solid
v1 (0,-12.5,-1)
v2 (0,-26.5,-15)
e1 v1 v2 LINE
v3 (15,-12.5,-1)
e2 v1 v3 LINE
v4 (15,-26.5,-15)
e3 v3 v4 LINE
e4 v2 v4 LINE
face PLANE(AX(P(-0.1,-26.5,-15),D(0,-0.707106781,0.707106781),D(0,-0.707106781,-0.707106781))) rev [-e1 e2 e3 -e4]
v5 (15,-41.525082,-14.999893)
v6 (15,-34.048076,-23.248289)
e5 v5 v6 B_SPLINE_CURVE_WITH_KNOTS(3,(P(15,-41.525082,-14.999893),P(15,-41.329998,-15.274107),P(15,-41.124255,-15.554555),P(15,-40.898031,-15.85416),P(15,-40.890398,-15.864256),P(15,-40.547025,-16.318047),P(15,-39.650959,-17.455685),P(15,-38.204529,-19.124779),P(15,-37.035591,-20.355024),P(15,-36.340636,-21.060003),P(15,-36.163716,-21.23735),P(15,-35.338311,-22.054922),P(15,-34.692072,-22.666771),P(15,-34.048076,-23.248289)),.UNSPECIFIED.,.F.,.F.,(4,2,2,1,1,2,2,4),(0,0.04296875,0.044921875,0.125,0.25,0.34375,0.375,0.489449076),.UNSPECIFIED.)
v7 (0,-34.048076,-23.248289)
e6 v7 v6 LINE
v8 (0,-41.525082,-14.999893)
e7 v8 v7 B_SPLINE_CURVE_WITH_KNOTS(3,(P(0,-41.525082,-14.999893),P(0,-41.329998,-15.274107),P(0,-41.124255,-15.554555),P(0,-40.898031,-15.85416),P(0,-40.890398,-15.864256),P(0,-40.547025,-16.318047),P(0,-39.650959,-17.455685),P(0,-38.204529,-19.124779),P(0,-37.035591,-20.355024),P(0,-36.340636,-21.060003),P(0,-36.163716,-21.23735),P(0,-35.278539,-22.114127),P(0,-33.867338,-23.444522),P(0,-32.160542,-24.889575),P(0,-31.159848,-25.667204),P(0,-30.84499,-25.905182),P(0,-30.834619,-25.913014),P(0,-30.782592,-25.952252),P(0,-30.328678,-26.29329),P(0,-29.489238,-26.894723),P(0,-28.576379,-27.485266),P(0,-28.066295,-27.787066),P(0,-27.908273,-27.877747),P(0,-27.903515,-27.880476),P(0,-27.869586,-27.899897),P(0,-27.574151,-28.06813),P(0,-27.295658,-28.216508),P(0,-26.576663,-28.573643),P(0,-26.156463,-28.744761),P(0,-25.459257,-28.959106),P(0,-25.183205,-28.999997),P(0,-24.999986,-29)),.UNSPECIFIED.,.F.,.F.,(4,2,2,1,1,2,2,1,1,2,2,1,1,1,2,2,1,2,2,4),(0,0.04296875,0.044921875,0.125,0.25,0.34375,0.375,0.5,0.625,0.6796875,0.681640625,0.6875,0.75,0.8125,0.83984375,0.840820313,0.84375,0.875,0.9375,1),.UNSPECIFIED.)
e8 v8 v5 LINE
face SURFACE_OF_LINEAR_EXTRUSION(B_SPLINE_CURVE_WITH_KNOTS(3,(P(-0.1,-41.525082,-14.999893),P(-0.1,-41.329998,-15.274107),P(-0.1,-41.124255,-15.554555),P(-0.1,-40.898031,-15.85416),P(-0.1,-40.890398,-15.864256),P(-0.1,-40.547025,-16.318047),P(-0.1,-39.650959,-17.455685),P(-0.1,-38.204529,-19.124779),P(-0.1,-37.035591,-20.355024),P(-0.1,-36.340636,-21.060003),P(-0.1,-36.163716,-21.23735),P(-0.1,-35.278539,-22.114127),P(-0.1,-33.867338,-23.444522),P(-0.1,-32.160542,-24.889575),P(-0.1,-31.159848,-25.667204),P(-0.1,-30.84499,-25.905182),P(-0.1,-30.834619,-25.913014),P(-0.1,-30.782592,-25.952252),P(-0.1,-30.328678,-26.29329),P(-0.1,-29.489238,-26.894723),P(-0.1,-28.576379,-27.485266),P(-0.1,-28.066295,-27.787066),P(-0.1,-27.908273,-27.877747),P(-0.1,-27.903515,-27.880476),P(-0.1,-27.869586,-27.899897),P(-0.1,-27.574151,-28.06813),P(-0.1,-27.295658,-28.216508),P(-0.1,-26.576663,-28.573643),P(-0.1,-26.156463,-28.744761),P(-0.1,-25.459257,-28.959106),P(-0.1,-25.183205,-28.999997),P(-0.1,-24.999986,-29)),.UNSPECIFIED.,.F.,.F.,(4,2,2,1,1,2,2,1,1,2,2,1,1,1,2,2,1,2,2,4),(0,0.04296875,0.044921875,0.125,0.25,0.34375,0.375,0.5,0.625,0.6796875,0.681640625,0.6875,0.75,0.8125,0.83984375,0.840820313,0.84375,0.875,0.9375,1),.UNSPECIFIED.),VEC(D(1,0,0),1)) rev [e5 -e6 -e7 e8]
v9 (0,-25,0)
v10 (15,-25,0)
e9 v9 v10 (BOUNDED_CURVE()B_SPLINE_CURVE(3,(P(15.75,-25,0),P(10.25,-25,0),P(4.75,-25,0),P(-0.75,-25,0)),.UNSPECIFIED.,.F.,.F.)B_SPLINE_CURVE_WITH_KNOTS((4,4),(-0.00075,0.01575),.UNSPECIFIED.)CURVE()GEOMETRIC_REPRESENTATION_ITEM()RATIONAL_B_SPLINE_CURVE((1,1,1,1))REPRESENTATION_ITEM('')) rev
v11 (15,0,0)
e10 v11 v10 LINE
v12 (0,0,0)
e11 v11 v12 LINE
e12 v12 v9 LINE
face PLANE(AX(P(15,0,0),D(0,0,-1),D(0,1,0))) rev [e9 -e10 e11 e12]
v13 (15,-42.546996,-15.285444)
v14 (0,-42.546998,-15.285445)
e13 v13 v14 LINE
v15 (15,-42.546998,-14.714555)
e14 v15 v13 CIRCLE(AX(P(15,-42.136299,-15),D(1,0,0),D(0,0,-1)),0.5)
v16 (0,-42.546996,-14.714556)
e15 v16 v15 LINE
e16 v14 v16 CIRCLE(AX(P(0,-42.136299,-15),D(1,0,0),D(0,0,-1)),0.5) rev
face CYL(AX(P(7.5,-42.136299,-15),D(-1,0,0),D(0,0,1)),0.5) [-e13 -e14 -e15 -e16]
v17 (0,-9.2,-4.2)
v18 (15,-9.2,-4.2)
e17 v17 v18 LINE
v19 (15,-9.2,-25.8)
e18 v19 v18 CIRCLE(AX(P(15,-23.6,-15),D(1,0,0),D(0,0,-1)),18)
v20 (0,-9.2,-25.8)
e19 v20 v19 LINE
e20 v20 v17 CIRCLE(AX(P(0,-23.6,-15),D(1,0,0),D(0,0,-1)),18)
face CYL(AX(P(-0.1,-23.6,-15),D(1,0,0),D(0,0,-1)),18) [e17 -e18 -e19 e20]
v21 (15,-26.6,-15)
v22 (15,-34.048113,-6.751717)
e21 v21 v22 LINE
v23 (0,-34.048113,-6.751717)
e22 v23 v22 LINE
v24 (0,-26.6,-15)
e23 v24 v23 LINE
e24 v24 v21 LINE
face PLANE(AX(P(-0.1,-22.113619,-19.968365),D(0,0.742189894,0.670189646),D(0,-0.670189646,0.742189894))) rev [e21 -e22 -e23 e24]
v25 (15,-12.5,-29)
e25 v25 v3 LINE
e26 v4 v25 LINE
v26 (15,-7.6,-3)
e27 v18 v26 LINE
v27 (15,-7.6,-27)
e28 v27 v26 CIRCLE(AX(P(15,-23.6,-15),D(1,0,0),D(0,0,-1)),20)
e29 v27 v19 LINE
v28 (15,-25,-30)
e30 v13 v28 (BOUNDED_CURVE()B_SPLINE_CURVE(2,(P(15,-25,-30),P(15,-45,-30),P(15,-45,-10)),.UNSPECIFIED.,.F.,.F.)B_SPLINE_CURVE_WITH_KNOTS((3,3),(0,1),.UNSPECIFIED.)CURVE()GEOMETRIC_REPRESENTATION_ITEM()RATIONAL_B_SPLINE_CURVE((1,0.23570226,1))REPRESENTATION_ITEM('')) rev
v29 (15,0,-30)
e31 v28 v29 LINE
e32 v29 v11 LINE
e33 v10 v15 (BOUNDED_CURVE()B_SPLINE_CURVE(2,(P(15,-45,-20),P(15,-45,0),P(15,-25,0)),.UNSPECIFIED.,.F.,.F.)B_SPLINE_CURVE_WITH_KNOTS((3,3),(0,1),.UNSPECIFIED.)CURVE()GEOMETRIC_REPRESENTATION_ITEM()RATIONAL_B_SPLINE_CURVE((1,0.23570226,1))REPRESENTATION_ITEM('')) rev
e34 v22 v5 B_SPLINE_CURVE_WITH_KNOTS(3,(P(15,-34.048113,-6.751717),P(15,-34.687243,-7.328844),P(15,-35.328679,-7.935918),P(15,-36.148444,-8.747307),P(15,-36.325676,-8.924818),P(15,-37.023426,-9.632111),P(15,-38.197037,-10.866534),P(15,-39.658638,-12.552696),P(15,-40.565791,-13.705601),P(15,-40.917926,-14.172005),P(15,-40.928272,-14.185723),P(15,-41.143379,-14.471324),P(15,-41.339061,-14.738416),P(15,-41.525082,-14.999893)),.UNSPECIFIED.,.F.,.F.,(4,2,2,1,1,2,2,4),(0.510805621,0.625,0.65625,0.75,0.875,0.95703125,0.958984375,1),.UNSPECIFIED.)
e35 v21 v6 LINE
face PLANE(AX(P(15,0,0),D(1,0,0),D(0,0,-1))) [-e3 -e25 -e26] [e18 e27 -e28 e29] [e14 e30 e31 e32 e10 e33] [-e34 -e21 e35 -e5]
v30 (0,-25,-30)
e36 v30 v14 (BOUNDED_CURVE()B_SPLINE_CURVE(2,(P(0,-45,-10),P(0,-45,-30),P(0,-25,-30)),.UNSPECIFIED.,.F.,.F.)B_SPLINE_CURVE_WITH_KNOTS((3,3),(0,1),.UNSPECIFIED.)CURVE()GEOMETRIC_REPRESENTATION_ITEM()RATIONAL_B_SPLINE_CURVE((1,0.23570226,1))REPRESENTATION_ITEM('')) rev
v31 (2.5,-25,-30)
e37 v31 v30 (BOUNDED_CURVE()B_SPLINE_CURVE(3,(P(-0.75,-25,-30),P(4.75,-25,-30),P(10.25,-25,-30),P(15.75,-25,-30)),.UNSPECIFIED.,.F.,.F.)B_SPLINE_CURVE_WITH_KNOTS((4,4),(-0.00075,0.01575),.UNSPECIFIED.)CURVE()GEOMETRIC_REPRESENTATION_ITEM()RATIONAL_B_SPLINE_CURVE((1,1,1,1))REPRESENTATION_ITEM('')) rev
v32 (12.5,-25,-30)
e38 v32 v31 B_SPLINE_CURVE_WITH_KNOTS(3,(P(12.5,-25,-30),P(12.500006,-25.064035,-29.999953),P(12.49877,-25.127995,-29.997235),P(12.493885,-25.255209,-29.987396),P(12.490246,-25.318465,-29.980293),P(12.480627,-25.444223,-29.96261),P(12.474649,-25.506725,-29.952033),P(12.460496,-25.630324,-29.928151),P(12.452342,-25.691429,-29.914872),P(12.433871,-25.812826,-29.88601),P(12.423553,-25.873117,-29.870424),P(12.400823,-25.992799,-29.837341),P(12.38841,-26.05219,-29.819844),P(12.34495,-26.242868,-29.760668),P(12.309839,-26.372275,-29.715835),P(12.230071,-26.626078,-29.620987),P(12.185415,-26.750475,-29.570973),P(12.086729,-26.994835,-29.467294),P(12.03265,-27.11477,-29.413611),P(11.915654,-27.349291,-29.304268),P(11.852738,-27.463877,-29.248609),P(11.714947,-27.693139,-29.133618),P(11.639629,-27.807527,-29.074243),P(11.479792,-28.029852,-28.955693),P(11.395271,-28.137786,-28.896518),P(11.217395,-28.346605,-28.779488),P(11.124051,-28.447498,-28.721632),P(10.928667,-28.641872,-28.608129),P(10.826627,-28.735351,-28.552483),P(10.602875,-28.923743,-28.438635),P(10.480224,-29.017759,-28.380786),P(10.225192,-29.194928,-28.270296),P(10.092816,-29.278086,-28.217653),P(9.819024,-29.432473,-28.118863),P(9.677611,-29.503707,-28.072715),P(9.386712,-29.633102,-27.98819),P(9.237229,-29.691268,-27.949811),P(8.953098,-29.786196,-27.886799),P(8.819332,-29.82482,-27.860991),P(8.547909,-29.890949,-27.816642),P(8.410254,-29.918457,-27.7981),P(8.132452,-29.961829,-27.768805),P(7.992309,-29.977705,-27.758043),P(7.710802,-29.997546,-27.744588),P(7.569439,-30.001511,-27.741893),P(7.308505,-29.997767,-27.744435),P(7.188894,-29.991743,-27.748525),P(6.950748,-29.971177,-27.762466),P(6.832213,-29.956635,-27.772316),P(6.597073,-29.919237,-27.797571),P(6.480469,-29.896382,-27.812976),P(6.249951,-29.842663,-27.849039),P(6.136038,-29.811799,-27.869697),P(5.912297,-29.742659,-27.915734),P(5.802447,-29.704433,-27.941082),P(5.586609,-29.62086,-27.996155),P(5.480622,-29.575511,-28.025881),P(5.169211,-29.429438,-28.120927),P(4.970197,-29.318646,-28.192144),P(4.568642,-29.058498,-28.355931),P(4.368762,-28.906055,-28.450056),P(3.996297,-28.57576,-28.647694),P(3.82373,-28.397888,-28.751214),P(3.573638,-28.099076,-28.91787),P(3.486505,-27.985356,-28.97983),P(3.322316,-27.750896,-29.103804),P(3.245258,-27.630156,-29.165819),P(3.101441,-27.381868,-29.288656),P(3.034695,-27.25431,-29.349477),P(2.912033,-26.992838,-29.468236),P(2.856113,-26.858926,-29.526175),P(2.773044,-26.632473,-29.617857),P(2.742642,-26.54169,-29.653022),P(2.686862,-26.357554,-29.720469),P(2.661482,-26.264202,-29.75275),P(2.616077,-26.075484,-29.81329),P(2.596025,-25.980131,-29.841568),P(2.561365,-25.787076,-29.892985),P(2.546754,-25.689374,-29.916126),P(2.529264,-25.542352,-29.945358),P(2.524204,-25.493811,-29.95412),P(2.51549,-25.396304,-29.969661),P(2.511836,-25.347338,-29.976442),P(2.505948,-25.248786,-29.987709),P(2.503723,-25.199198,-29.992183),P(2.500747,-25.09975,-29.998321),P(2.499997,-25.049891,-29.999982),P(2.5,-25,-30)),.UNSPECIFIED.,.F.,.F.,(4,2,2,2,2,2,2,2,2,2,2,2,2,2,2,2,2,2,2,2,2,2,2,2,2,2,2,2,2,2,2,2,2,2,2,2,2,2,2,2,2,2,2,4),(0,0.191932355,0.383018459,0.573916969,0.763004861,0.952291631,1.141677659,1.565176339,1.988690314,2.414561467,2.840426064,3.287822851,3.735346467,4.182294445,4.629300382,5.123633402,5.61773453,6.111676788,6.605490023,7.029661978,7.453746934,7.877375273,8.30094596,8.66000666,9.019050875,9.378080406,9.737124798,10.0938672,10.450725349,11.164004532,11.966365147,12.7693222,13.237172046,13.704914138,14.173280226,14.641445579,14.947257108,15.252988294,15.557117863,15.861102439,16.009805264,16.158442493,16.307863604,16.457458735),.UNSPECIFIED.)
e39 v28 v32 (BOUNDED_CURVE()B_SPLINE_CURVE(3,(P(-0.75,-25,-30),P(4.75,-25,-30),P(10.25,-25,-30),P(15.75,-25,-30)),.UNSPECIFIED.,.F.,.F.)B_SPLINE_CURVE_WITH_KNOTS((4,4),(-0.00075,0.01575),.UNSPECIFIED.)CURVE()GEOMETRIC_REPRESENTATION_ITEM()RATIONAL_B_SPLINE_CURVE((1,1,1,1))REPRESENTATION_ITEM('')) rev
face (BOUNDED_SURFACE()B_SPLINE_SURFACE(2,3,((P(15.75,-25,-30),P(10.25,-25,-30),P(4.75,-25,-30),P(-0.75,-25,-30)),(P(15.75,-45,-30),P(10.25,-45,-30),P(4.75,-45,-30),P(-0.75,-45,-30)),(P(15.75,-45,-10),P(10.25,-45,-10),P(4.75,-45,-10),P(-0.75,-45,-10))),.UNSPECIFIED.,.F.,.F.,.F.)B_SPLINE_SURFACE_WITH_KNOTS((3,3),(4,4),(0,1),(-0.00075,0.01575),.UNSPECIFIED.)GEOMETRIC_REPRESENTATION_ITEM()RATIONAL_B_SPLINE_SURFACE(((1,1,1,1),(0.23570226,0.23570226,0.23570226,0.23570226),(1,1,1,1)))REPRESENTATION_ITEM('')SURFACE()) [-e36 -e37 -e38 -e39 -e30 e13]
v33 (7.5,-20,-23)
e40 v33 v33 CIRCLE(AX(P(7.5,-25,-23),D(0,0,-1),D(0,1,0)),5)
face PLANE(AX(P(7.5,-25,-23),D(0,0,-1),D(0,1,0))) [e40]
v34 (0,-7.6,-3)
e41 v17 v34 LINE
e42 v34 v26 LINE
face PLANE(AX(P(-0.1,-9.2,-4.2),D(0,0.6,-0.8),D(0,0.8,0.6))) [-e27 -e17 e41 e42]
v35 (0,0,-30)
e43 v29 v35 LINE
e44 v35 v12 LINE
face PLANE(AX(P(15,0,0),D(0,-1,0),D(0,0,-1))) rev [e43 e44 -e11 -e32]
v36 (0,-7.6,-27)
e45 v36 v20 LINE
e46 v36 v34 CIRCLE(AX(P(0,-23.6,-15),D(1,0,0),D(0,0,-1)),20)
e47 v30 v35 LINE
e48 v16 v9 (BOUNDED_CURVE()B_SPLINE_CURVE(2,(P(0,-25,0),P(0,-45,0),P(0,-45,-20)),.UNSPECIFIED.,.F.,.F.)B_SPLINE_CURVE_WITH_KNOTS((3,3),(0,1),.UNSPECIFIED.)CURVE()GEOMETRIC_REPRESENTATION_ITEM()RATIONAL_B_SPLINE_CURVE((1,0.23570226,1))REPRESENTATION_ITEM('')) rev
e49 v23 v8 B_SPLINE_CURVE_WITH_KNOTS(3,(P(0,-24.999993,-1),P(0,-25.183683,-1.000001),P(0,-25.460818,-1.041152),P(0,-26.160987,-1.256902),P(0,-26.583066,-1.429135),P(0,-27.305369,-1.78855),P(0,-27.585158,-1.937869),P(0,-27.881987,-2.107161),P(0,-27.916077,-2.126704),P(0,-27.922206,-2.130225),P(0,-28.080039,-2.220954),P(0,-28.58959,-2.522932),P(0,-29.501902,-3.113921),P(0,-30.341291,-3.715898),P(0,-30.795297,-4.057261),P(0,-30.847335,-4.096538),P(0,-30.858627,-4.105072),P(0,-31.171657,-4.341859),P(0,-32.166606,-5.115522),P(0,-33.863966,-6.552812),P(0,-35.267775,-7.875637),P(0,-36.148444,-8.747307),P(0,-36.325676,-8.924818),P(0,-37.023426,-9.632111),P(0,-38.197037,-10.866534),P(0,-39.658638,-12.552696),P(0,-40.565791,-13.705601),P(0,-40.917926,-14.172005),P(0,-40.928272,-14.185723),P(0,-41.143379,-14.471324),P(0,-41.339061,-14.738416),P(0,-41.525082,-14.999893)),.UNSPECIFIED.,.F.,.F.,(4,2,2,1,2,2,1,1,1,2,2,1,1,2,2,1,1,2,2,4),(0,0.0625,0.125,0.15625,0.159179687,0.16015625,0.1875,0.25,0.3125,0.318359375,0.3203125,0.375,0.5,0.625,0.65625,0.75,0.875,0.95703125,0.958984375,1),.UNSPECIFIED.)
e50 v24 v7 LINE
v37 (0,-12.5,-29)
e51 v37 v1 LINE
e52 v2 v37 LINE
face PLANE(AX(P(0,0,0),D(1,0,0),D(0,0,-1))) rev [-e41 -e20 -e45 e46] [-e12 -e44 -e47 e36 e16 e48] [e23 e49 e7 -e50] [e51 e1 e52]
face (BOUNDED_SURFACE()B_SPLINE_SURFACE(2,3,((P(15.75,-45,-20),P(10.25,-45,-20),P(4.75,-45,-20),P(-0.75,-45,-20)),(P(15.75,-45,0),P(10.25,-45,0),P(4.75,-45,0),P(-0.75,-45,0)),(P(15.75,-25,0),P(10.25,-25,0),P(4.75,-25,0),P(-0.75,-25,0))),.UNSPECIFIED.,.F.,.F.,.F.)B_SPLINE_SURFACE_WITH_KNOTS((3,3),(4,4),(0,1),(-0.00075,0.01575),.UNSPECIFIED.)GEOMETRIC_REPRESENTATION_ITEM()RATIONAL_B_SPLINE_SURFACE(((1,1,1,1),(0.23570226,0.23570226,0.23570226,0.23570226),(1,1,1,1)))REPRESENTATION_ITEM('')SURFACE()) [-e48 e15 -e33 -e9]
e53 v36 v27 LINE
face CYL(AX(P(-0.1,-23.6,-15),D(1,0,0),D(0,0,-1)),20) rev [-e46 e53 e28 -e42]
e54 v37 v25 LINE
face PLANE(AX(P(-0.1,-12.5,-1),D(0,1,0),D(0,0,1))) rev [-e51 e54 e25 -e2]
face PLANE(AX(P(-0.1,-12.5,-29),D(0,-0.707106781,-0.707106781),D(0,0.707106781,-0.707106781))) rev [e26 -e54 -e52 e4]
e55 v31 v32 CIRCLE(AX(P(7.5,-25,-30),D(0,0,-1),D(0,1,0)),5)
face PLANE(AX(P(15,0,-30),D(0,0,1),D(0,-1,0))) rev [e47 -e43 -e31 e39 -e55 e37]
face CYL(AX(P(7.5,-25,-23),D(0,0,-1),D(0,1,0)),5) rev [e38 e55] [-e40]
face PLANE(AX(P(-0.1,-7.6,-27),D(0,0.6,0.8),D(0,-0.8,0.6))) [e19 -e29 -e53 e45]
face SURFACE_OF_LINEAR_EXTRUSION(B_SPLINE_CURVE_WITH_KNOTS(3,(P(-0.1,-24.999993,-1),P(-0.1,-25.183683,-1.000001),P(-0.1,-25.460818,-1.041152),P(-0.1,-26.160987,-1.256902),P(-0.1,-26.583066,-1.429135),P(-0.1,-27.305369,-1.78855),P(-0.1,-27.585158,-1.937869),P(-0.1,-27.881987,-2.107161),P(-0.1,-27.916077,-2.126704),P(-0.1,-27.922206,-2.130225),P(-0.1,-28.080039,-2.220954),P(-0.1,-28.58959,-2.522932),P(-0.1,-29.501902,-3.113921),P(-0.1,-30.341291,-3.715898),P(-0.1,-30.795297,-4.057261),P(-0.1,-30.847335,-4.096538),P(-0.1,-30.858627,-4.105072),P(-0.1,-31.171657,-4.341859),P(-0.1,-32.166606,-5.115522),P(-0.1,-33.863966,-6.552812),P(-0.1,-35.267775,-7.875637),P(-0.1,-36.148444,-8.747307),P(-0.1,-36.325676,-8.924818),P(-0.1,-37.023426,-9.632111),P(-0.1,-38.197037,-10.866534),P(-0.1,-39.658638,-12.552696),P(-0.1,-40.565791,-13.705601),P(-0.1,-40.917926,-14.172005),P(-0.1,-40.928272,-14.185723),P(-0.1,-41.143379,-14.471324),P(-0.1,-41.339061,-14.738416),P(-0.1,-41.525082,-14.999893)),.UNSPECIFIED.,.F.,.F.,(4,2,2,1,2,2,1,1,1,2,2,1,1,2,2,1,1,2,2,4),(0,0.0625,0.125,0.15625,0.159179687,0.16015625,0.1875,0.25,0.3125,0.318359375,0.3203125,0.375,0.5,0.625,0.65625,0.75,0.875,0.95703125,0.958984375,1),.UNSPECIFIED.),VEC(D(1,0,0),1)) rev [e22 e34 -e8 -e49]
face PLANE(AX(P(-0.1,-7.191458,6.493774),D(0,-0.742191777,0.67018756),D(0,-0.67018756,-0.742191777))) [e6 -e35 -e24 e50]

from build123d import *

# Parameters (mm, degrees)
SKETCH3_W           = 30
SKETCH3_H           = 45
BOSS_EXTRUDE1_DEPTH = 15
FILLET1_SIZE        = 20
CUT_EXTRUDE3_DEPTH  = 55.331916325
CUT_EXTRUDE8_DEPTH  = 55.331916325
CUT_EXTRUDE9_DEPTH  = 55.331916325
SKETCH25_R          = 5
CUT_EXTRUDE11_DEPTH = 7
FILLET2_R           = 0.5


with BuildPart() as part:
    # Sketch3 → Boss-Extrude1 (new body)
    with BuildSketch(Plane(origin=(0, 0, 0), x_dir=(0, 0, -1), z_dir=(1, 0, 0))):
        with Locations((15, -22.5)):
            Rectangle(SKETCH3_W, SKETCH3_H)
    extrude(amount=BOSS_EXTRUDE1_DEPTH)

    # Fillet1
    # a fillet whose section is not a circle: 20 mm, written as the material it takes off along each edge
    with BuildSketch(Plane(origin=(-50, -45, -30), x_dir=(0, 1, 0), z_dir=(1, 0, 0)), Plane(origin=(-50, -45, 0), x_dir=(0, 0, -1), z_dir=(1, 0, 0))) as fillet1_piece_1:
        with BuildLine():
            Bezier((FILLET1_SIZE, 0), (0, 0), (0, FILLET1_SIZE), weights=[1, 0.23570226, 1])
            Line((0, FILLET1_SIZE), (0, 0))
            Line((0, 0), (FILLET1_SIZE, 0))
        make_face()
    extrude(amount=115, mode=Mode.SUBTRACT)

    # Sketch13 → Cut-Extrude3 (cut, through all)
    with BuildSketch(Plane(origin=(15, 0, 0), x_dir=(0, 0, -1), z_dir=(1, 0, 0))):
        Polygon((1, -12.5), (29, -12.5), (15, -26.5), align=None)
    extrude(amount=-CUT_EXTRUDE3_DEPTH, mode=Mode.SUBTRACT)

    # Sketch21 → Cut-Extrude8 (cut, through all)
    with BuildSketch(Plane(origin=(15, 0, 0), x_dir=(0, 0, -1), z_dir=(1, 0, 0))):
        with BuildLine():
            Line((20.999099472, -32.017092941), (15, -26.6))
            Line((15, -26.6), (9.197837651, -31.8392914))
            Line((9.197837651, -31.8392914), (6.751716779, -34.048112747))
            add(Edge.make_bspline(
                [(6.751716779, -34.048112747), (7.137670563, -34.475530569), (7.537017115, -34.903979725), (7.94976684, -35.333427086)],
                knots=[0.510805621, 0.510805621, 0.510805621, 0.510805621, 0.58717305, 0.58717305, 0.58717305, 0.58717305], degree=3))
            add(Edge.make_bspline(
                [(7.94976684, -35.333427086), (8.154213463, -35.546144521), (8.361948556, -35.759106865), (8.74730745, -36.148443801), (8.924817998, -36.325675997), (9.632110907, -37.023426184), (10.866534028, -38.197036851), (12.552696064, -39.658637771), (13.705600922, -40.565790559), (14.17200535, -40.917925916), (14.185722754, -40.928272256), (14.211686476, -40.947827457), (14.276533102, -40.99660607), (14.547571615, -41.199178962), (14.800672356, -41.38335147), (14.999893178, -41.525081651)],
                knots=[0.58717305, 0.58717305, 0.58717305, 0.58717305, 0.625, 0.625, 0.65625, 0.65625, 0.75, 0.875, 0.95703125, 0.95703125, 0.958984375, 0.958984375, 0.9609375, 0.96875, 1, 1, 1, 1], degree=3))
            add(Edge.make_bspline(
                [(14.999893178, -41.525081651), (15.199321685, -41.383202546), (15.452729149, -41.198806282), (15.737075559, -40.986289622), (15.815081437, -40.9275387), (15.85416041, -40.898031283), (15.864256494, -40.890397912), (16.318047278, -40.547025448), (17.4556848, -39.650959263), (19.12477944, -38.204529259), (20.355024133, -37.035590602), (21.060002804, -36.340635733), (21.237350271, -36.163716309), (21.656669951, -35.740378843), (21.89625213, -35.494384393), (22.131454088, -35.24870359)],
                knots=[0, 0, 0, 0, 0.03125, 0.0390625, 0.04296875, 0.04296875, 0.044921875, 0.044921875, 0.125, 0.25, 0.34375, 0.34375, 0.375, 0.375, 0.41847678, 0.41847678, 0.41847678, 0.41847678], degree=3))
            add(Edge.make_bspline(
                [(22.131454088, -35.24870359), (22.51540209, -34.847649728), (22.88767772, -34.447431671), (23.24828941, -34.048076256)],
                knots=[0.41847678, 0.41847678, 0.41847678, 0.41847678, 0.489449076, 0.489449076, 0.489449076, 0.489449076], degree=3))
            Line((23.24828941, -34.048076256), (20.999099472, -32.017092941))
        make_face()
    extrude(amount=-CUT_EXTRUDE8_DEPTH, mode=Mode.SUBTRACT)

    # Sketch23 → Cut-Extrude9 (cut, through all)
    with BuildSketch(Plane(origin=(15, 0, 0), x_dir=(0, 0, -1), z_dir=(1, 0, 0))):
        with BuildLine():
            Line((27, -7.6), (25.8, -9.2))
            ThreePointArc((25.8, -9.2), (15, -5.6), (4.2, -9.2))
            Line((4.2, -9.2), (3, -7.6))
            ThreePointArc((3, -7.6), (15, -3.6), (27, -7.6))
        make_face()
    extrude(amount=-CUT_EXTRUDE9_DEPTH, mode=Mode.SUBTRACT)

    # Sketch25 → Cut-Extrude11 (cut)
    with BuildSketch(Plane(origin=(0, 0, -30), x_dir=(-1, 0, 0), z_dir=(0, 0, -1))):
        with Locations(Location((-7.5, -25, 0), (0, 0, 90))):
            Circle(SKETCH25_R)
    extrude(amount=-CUT_EXTRUDE11_DEPTH, mode=Mode.SUBTRACT)

    # Fillet2
    fillet2_edges = [part.edges().sort_by_distance(p)[0] for p in [
        (7.5, -42.742918852, -15),
    ]]
    fillet(fillet2_edges, radius=FILLET2_R)


solid = part.part
